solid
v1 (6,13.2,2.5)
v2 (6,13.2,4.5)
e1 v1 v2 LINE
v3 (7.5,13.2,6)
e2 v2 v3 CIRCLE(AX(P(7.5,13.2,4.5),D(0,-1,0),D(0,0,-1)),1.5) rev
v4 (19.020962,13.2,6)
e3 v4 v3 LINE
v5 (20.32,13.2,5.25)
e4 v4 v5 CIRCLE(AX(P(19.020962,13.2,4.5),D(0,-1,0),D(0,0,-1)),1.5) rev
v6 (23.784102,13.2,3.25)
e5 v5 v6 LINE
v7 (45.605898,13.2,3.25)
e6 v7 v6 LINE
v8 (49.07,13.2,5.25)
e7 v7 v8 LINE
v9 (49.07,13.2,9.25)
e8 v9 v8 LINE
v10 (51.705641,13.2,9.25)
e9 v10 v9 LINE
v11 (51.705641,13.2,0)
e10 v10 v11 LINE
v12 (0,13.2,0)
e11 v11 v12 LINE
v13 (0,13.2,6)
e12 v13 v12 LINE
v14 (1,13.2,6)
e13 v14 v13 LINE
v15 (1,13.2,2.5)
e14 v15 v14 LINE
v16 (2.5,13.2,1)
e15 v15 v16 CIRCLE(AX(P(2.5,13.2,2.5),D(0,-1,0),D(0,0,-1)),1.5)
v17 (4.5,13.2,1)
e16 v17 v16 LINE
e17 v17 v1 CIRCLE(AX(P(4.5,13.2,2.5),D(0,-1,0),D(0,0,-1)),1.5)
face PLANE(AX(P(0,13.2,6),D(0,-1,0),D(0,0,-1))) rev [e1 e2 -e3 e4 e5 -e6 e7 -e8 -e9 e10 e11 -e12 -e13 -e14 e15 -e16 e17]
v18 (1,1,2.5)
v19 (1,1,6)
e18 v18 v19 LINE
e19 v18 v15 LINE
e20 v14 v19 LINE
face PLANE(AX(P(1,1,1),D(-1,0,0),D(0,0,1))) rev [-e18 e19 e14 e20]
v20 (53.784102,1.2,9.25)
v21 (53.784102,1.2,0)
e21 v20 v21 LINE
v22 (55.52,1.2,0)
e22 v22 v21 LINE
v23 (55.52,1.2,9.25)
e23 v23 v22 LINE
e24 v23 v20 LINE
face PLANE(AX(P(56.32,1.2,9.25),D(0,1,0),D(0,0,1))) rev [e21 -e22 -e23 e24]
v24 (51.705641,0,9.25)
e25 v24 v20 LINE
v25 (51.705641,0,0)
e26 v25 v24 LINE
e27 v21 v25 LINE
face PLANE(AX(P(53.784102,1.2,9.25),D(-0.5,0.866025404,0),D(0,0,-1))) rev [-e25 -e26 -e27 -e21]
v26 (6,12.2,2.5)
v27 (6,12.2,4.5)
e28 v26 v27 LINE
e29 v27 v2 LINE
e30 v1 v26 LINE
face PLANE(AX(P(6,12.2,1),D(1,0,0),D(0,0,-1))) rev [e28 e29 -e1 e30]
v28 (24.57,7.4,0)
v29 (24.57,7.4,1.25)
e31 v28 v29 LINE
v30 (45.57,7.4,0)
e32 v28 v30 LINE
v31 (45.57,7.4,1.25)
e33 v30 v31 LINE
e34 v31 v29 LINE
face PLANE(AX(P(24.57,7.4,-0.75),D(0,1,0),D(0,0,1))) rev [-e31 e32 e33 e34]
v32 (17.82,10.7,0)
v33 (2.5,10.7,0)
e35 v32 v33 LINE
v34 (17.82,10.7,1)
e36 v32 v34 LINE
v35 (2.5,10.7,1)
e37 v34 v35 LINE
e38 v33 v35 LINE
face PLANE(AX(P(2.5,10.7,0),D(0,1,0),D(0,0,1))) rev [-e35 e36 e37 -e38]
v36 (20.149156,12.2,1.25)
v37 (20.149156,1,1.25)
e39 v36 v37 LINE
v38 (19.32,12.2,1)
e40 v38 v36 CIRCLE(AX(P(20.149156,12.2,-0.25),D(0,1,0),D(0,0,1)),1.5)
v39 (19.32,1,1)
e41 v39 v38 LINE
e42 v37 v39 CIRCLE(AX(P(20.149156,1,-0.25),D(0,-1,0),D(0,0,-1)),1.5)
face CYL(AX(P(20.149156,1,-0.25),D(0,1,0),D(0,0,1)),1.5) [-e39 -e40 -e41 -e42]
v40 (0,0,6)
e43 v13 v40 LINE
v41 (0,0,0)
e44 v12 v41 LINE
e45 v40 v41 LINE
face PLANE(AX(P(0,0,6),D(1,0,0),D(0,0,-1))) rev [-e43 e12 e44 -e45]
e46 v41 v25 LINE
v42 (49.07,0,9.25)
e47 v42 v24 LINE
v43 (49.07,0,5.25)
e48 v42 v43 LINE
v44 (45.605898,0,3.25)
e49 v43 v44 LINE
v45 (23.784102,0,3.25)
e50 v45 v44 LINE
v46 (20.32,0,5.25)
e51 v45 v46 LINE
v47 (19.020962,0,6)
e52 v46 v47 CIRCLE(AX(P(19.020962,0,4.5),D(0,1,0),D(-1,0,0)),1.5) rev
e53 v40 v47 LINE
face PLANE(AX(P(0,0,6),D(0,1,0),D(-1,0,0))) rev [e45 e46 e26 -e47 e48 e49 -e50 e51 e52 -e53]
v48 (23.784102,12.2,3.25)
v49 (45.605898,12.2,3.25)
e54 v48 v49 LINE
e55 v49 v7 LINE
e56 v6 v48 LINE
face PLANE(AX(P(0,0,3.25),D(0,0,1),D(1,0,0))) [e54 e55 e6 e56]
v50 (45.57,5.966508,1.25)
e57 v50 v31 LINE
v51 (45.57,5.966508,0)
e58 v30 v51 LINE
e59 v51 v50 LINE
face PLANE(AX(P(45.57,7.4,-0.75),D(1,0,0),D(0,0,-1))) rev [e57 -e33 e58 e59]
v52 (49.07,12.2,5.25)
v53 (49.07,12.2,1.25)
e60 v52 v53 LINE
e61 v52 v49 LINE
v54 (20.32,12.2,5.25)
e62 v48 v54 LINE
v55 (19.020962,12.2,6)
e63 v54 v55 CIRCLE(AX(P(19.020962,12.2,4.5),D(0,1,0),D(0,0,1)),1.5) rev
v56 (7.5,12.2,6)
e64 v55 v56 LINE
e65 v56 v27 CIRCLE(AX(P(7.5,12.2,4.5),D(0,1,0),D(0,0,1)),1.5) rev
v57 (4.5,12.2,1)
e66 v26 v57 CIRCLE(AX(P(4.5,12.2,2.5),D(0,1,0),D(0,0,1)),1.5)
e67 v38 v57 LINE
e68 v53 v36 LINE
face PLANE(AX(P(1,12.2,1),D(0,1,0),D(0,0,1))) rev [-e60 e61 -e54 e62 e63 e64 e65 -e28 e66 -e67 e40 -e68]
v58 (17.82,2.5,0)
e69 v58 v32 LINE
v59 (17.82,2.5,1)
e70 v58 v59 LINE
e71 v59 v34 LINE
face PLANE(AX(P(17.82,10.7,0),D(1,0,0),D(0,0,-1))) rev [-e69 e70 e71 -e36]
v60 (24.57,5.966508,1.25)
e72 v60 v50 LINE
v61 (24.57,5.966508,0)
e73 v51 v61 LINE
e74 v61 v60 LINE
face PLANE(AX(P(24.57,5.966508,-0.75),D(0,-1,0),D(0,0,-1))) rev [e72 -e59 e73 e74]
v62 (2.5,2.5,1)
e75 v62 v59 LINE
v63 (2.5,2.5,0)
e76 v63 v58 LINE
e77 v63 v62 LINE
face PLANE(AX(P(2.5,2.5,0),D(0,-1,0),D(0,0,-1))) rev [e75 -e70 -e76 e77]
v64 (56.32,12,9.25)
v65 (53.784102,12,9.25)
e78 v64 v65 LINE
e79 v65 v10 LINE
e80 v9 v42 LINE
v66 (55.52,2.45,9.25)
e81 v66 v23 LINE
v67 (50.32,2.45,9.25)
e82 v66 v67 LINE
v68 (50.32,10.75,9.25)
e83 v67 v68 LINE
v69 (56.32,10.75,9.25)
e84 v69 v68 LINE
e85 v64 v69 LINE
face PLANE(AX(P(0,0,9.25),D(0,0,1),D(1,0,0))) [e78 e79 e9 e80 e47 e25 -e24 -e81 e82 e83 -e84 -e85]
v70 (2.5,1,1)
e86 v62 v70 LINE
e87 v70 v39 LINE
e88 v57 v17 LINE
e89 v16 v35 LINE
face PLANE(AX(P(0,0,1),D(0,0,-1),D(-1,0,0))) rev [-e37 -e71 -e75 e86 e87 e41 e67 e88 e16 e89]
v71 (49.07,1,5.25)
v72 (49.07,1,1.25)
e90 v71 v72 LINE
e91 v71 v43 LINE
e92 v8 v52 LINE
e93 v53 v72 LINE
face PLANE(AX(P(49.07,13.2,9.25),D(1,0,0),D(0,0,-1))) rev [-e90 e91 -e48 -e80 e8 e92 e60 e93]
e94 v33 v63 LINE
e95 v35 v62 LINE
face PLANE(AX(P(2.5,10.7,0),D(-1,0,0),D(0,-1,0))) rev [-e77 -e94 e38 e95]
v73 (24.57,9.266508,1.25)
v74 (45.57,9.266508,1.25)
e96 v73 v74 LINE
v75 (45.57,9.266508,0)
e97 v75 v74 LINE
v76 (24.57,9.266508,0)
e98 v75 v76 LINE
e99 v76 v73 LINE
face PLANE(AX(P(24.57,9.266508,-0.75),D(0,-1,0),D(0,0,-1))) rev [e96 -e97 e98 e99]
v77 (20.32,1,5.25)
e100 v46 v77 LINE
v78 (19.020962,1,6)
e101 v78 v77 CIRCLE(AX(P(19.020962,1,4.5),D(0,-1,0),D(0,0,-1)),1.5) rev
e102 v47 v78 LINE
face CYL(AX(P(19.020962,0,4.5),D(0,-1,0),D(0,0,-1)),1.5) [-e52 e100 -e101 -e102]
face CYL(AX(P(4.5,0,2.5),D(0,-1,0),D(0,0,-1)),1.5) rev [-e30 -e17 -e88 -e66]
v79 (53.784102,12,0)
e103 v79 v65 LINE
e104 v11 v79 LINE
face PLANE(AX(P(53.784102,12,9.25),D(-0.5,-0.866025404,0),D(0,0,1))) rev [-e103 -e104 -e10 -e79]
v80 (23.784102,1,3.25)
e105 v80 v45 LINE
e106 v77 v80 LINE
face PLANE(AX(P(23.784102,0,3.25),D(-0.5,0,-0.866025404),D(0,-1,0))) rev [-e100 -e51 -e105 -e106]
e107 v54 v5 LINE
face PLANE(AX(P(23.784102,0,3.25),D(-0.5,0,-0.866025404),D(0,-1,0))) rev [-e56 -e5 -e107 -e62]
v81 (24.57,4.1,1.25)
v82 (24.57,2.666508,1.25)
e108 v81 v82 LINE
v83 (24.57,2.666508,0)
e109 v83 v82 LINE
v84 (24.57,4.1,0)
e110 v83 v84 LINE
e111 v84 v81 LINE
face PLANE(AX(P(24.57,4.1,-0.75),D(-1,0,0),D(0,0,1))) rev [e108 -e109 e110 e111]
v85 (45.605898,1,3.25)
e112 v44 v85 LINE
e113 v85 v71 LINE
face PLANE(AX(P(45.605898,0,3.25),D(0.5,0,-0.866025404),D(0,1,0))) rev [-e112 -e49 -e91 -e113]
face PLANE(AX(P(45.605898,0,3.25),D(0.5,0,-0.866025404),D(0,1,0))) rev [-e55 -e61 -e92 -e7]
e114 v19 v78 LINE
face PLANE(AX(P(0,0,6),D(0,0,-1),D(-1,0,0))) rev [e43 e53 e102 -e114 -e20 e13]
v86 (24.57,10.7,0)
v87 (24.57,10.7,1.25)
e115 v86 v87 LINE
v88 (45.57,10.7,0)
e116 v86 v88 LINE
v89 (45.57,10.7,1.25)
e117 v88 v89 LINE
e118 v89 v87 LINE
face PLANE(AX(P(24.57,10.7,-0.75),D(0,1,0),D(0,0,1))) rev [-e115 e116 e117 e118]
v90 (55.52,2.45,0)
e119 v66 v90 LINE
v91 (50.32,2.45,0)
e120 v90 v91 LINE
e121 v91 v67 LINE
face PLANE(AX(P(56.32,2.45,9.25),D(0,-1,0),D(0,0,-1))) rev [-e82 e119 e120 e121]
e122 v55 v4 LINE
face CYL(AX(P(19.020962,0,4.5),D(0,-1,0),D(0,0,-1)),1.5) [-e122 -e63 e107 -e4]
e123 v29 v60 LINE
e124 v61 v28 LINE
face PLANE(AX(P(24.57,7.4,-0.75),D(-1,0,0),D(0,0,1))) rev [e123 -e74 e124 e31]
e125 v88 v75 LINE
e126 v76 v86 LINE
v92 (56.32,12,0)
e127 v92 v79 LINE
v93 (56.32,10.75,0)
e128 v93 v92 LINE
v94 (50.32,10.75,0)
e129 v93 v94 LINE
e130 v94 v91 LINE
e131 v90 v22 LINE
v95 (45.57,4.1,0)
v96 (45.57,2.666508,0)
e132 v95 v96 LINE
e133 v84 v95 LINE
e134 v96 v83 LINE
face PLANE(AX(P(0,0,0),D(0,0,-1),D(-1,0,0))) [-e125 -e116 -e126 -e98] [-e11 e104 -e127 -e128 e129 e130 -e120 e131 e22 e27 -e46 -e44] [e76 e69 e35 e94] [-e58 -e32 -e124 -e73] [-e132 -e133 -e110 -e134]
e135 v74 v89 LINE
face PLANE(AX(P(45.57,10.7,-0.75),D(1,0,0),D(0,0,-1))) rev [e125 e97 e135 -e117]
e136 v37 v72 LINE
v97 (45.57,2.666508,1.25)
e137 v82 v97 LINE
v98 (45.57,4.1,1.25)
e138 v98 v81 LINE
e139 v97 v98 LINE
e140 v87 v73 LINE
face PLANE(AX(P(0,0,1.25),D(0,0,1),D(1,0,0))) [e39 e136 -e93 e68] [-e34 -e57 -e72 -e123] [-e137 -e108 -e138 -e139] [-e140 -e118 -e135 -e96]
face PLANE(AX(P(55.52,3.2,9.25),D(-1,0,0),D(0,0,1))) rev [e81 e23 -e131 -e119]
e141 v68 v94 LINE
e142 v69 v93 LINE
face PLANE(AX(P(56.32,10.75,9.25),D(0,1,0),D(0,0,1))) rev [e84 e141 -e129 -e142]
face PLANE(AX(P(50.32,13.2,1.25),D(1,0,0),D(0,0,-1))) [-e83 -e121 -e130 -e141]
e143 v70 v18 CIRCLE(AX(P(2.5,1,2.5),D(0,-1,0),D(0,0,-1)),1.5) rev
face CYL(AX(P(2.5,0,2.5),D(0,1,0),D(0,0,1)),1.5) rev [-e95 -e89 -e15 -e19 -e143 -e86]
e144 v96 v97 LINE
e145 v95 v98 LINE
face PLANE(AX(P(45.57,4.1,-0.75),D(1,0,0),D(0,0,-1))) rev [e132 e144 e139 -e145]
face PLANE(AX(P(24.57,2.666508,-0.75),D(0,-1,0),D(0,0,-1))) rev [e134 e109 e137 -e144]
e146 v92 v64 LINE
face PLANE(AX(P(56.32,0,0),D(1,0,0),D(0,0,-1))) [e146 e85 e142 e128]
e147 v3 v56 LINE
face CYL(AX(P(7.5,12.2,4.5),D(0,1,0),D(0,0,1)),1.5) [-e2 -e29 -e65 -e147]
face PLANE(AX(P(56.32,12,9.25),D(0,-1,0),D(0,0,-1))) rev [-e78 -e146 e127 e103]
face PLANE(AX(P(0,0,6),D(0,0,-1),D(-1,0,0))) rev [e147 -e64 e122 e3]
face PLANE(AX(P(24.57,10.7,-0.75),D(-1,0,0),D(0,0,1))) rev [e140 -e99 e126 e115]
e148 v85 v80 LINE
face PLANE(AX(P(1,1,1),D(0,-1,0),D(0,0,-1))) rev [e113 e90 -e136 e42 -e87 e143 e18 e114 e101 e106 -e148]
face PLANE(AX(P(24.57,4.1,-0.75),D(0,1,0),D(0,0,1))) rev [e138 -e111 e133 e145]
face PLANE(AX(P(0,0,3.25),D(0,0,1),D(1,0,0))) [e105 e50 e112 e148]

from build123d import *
from OCP.BRepFilletAPI import BRepFilletAPI_MakeChamfer

# Parameters (mm, degrees)
ESQUISSE1_W             = 20.32
ESQUISSE1_H             = 13.2
BOSS_EXTRU_1_DEPTH      = 6
ESQUISSE2_W             = 18.32
ESQUISSE2_H             = 11.2
ENL_V_MAT_EXTRU_1_DEPTH = 5
ESQUISSE3_W             = 5
ESQUISSE3_H             = 1
ENL_V_MAT_EXTRU_2_DEPTH = 5
ESQUISSE4_W             = 15.32
ESQUISSE4_H             = 8.2
ENL_V_MAT_EXTRU_3_DEPTH = 25.741511676
ESQUISSE6_W             = 1
ESQUISSE6_H             = 11.2
ENL_V_MAT_EXTRU_4_DEPTH = 4.75
ESQUISSE7_W             = 30
ESQUISSE7_H             = 13.2
BOSS_EXTRU_2_DEPTH      = 1.25
ESQUISSE8_W             = 1.25
ESQUISSE8_H             = 13.2
BOSS_EXTRU_3_DEPTH      = 8
ESQUISSE9_W             = 9.25
ESQUISSE9_H             = 1.25
BOSS_EXTRU_4_DEPTH      = 6
CHANFREIN1_SIZE         = 2
CHANFREIN1_SIZE_2       = 3.464101615
ESQUISSE10_W            = 28.75
ESQUISSE10_H            = 1
BOSS_EXTRU_5_DEPTH      = 2
CHANFREIN2_SIZE         = 2
CHANFREIN2_SIZE2        = 3.464101615
ESQUISSE11_W            = 21
ESQUISSE11_H            = 1.433492253
ENL_V_MAT_EXTRU_5_DEPTH = 2
ESQUISSE12_W            = 0.8
ESQUISSE12_H            = 9.25
ENL_V_MAT_EXTRU_6_DEPTH = 2
CONG_1_R                = 1.5


with BuildPart() as part:
    # Esquisse1 → Boss.-Extru.1 (new body)
    with BuildSketch(Plane.XY):
        with Locations((10.16, 6.6)):
            Rectangle(ESQUISSE1_W, ESQUISSE1_H)
    extrude(amount=BOSS_EXTRU_1_DEPTH)

    # Esquisse2 → Enlèv. mat.-Extru.1 (cut)
    with BuildSketch(Plane.XY.offset(6)):
        with Locations((10.16, 6.6)):
            Rectangle(ESQUISSE2_W, ESQUISSE2_H)
    extrude(amount=-ENL_V_MAT_EXTRU_1_DEPTH, mode=Mode.SUBTRACT)

    # Esquisse3 → Enlèv. mat.-Extru.2 (cut)
    with BuildSketch(Plane.XY.offset(6)):
        with Locations((3.5, 12.7)):
            Rectangle(ESQUISSE3_W, ESQUISSE3_H)
    extrude(amount=-ENL_V_MAT_EXTRU_2_DEPTH, mode=Mode.SUBTRACT)

    # Esquisse4 → Enlèv. mat.-Extru.3 (cut, through all)
    with BuildSketch(Plane.XY.offset(1)):
        with Locations((10.16, 6.6)):
            Rectangle(ESQUISSE4_W, ESQUISSE4_H)
    extrude(amount=-ENL_V_MAT_EXTRU_3_DEPTH, mode=Mode.SUBTRACT)

    # Esquisse6 → Enlèv. mat.-Extru.4 (cut)
    with BuildSketch(Plane.XY.offset(6)):
        with Locations((19.82, 6.6)):
            Rectangle(ESQUISSE6_W, ESQUISSE6_H)
    extrude(amount=-ENL_V_MAT_EXTRU_4_DEPTH, mode=Mode.SUBTRACT)

    # Esquisse7 → Boss.-Extru.2 (add)
    with BuildSketch(Plane(origin=(0, 0, 0), x_dir=(-1, 0, 0), z_dir=(0, 0, -1))):
        with Locations((-35.32, 6.6)):
            Rectangle(ESQUISSE7_W, ESQUISSE7_H)
    extrude(amount=-BOSS_EXTRU_2_DEPTH)

    # Esquisse8 → Boss.-Extru.3 (add)
    with BuildSketch(Plane.XY.offset(1.25)):
        with Locations((49.695, 6.6)):
            Rectangle(ESQUISSE8_W, ESQUISSE8_H)
    extrude(amount=BOSS_EXTRU_3_DEPTH)

    # Esquisse9 → Boss.-Extru.4 (add)
    with BuildSketch(Plane(origin=(50.32, 0, 0), x_dir=(0, 0, -1), z_dir=(1, 0, 0))):
        with Locations((-4.625, 11.375)):
            Rectangle(ESQUISSE9_W, ESQUISSE9_H)
        with Locations((-4.625, 1.825)):
            Rectangle(ESQUISSE9_W, ESQUISSE9_H)
    extrude(amount=BOSS_EXTRU_4_DEPTH)

    # Chanfrein1
    # the kernel refuses this chamfer: 3.464101615, 2 mm, written as the material it adds along each edge
    with BuildSketch(Plane(origin=(50.32, 12, 9.25), x_dir=(0, 1, 0), z_dir=(0, 0, -1))) as chanfrein1_piece_1_section:
        Polygon((CHANFREIN1_SIZE, 0), (0, CHANFREIN1_SIZE_2), (0, 0), align=None)
    chanfrein1_piece_1 = extrude(amount=9.25, mode=Mode.PRIVATE)
    chanfrein1_piece_1 = split(chanfrein1_piece_1, bisect_by=Plane(origin=(50.32, 13.2, 9.25), z_dir=(0, -1, 0)), keep=Keep.TOP, mode=Mode.PRIVATE)
    add(chanfrein1_piece_1)
    with BuildSketch(Plane(origin=(50.32, 1.2, 0), x_dir=(0, -1, 0), z_dir=(0, 0, 1))) as chanfrein1_piece_2_section:
        Polygon((CHANFREIN1_SIZE, 0), (0, CHANFREIN1_SIZE_2), (0, 0), align=None)
    chanfrein1_piece_2 = extrude(amount=9.25, mode=Mode.PRIVATE)
    chanfrein1_piece_2 = split(chanfrein1_piece_2, bisect_by=Plane(origin=(50.32, 0, 0), z_dir=(0, 1, 0)), keep=Keep.TOP, mode=Mode.PRIVATE)
    add(chanfrein1_piece_2)

    # Esquisse10 → Boss.-Extru.5 (add)
    with BuildSketch(Plane.XY.offset(1.25)):
        with Locations((34.695, 12.7)):
            Rectangle(ESQUISSE10_W, ESQUISSE10_H)
        with Locations((34.695, 0.5)):
            Rectangle(ESQUISSE10_W, ESQUISSE10_H)
    extrude(amount=BOSS_EXTRU_5_DEPTH)

    # Chanfrein2: one chamfer whose edges measure the first distance from different faces: ONE call of the kernel's chamfer builder (chamfer() names one face for all edges)
    chanfrein2_edges_1 = [part.edges().sort_by_distance(p)[0] for p in [
        (20.32, 12.7, 3.25),
    ]]
    chanfrein2_side_1 = [part.faces().sort_by_distance(p)[0] for p in [
        (20.32, 12.7, 4.625),
    ]]
    chanfrein2_edges_2 = [part.edges().sort_by_distance(p)[0] for p in [
        (49.07, 12.7, 3.25),
        (49.07, 0.5, 3.25),
    ]]
    chanfrein2_side_2 = [part.faces().sort_by_distance(p)[0] for p in [
        (49.07, 6.6, 5.368110236),
    ]]
    chanfrein2_edges_3 = [part.edges().sort_by_distance(p)[0] for p in [
        (20.32, 0.5, 3.25),
    ]]
    chanfrein2_side_3 = [part.faces().sort_by_distance(p)[0] for p in [
        (20.32, 0.5, 4.625),
    ]]
    chanfrein2 = BRepFilletAPI_MakeChamfer(part.part.solid().wrapped)
    for e in chanfrein2_edges_1:
        chanfrein2.Add(CHANFREIN2_SIZE, CHANFREIN2_SIZE2, e.wrapped, chanfrein2_side_1[0].wrapped)  # the first distance lies on this face
    for e in chanfrein2_edges_2:
        chanfrein2.Add(CHANFREIN2_SIZE, CHANFREIN2_SIZE2, e.wrapped, chanfrein2_side_2[0].wrapped)  # the first distance lies on this face
    for e in chanfrein2_edges_3:
        chanfrein2.Add(CHANFREIN2_SIZE, CHANFREIN2_SIZE2, e.wrapped, chanfrein2_side_3[0].wrapped)  # the first distance lies on this face
    add(Compound.cast(chanfrein2.Shape()), mode=Mode.REPLACE)

    # Esquisse11 → Enlèv. mat.-Extru.5 (cut)
    with BuildSketch(Plane.XY.offset(1.25)):
        with Locations((35.07, 9.983253874)):
            Rectangle(ESQUISSE11_W, ESQUISSE11_H)
        with Locations((35.07, 6.683253873)):
            Rectangle(ESQUISSE11_W, ESQUISSE11_H)
        with Locations((35.07, 3.383253874)):
            Rectangle(ESQUISSE11_W, ESQUISSE11_H)
    extrude(amount=-ENL_V_MAT_EXTRU_5_DEPTH, mode=Mode.SUBTRACT)

    # Esquisse12 → Enlèv. mat.-Extru.6 (cut)
    with BuildSketch(Plane(origin=(0, 1.2, 0), x_dir=(-1, 0, 0), z_dir=(0, -1, 0))):
        with Locations((-55.92, -4.625)):
            Rectangle(ESQUISSE12_W, ESQUISSE12_H)
    extrude(amount=-ENL_V_MAT_EXTRU_6_DEPTH, mode=Mode.SUBTRACT)

    # Congé1
    # the kernel refuses this fillet: 1.5 mm, written as the material it adds along each edge
    with BuildSketch(Plane(origin=(1, 1, 1), x_dir=(0, 0, 1), z_dir=(0, 1, 0))) as cong_1_piece_1:
        with BuildLine():
            CenterArc((CONG_1_R, CONG_1_R), CONG_1_R, 180, 90)
            Line((0, CONG_1_R), (0, 0))
            Line((0, 0), (CONG_1_R, 0))
        make_face()
    extrude(amount=12.2)
    with BuildSketch(Plane(origin=(6, 12.2, 1), x_dir=(-1, 0, 0), z_dir=(0, 1, 0))) as cong_1_piece_2:
        with BuildLine():
            CenterArc((CONG_1_R, CONG_1_R), CONG_1_R, 180, 90)
            Line((0, CONG_1_R), (0, 0))
            Line((0, 0), (CONG_1_R, 0))
        make_face()
    extrude(amount=1)
    # the kernel refuses this fillet: 1.5 mm, written as the material it takes off along each edge
    with BuildSketch(Plane(origin=(20.32, -3.247595264, 6), x_dir=(-1, 0, 0), z_dir=(0, 1, 0)), Plane(origin=(20.32, 8.952404736, 6), x_dir=(-1, 0, 0), z_dir=(0, 1, 0))) as cong_1_2_piece_1:
        with BuildLine():
            CenterArc((1.299038106, -1.5), CONG_1_R, 90, 60)
            Line((0, -0.75), (0, 0))
            Line((0, 0), (1.299038106, 0))
        make_face()
    extrude(amount=7.495190528, mode=Mode.SUBTRACT)
    with BuildSketch(Plane(origin=(19.32, 1, 1.25), x_dir=(1, 0, 0), z_dir=(0, 1, 0))) as cong_1_2_piece_2:
        with BuildLine():
            CenterArc((0.829156198, 1.5), CONG_1_R, 236.442690238, 33.557309762)
            Line((0, 0.25), (0, 0))
            Line((0, 0), (0.829156198, 0))
        make_face()
    extrude(amount=11.2, mode=Mode.SUBTRACT)
    with BuildSketch(Plane(origin=(6, 8.45, 6), x_dir=(0, 0, -1), z_dir=(0, 1, 0))) as cong_1_2_piece_3:
        with BuildLine():
            CenterArc((CONG_1_R, -CONG_1_R), CONG_1_R, 90, 90)
            Line((0, -CONG_1_R), (0, 0))
            Line((0, 0), (CONG_1_R, 0))
        make_face()
    extrude(amount=8.5, mode=Mode.SUBTRACT)


solid = part.part
